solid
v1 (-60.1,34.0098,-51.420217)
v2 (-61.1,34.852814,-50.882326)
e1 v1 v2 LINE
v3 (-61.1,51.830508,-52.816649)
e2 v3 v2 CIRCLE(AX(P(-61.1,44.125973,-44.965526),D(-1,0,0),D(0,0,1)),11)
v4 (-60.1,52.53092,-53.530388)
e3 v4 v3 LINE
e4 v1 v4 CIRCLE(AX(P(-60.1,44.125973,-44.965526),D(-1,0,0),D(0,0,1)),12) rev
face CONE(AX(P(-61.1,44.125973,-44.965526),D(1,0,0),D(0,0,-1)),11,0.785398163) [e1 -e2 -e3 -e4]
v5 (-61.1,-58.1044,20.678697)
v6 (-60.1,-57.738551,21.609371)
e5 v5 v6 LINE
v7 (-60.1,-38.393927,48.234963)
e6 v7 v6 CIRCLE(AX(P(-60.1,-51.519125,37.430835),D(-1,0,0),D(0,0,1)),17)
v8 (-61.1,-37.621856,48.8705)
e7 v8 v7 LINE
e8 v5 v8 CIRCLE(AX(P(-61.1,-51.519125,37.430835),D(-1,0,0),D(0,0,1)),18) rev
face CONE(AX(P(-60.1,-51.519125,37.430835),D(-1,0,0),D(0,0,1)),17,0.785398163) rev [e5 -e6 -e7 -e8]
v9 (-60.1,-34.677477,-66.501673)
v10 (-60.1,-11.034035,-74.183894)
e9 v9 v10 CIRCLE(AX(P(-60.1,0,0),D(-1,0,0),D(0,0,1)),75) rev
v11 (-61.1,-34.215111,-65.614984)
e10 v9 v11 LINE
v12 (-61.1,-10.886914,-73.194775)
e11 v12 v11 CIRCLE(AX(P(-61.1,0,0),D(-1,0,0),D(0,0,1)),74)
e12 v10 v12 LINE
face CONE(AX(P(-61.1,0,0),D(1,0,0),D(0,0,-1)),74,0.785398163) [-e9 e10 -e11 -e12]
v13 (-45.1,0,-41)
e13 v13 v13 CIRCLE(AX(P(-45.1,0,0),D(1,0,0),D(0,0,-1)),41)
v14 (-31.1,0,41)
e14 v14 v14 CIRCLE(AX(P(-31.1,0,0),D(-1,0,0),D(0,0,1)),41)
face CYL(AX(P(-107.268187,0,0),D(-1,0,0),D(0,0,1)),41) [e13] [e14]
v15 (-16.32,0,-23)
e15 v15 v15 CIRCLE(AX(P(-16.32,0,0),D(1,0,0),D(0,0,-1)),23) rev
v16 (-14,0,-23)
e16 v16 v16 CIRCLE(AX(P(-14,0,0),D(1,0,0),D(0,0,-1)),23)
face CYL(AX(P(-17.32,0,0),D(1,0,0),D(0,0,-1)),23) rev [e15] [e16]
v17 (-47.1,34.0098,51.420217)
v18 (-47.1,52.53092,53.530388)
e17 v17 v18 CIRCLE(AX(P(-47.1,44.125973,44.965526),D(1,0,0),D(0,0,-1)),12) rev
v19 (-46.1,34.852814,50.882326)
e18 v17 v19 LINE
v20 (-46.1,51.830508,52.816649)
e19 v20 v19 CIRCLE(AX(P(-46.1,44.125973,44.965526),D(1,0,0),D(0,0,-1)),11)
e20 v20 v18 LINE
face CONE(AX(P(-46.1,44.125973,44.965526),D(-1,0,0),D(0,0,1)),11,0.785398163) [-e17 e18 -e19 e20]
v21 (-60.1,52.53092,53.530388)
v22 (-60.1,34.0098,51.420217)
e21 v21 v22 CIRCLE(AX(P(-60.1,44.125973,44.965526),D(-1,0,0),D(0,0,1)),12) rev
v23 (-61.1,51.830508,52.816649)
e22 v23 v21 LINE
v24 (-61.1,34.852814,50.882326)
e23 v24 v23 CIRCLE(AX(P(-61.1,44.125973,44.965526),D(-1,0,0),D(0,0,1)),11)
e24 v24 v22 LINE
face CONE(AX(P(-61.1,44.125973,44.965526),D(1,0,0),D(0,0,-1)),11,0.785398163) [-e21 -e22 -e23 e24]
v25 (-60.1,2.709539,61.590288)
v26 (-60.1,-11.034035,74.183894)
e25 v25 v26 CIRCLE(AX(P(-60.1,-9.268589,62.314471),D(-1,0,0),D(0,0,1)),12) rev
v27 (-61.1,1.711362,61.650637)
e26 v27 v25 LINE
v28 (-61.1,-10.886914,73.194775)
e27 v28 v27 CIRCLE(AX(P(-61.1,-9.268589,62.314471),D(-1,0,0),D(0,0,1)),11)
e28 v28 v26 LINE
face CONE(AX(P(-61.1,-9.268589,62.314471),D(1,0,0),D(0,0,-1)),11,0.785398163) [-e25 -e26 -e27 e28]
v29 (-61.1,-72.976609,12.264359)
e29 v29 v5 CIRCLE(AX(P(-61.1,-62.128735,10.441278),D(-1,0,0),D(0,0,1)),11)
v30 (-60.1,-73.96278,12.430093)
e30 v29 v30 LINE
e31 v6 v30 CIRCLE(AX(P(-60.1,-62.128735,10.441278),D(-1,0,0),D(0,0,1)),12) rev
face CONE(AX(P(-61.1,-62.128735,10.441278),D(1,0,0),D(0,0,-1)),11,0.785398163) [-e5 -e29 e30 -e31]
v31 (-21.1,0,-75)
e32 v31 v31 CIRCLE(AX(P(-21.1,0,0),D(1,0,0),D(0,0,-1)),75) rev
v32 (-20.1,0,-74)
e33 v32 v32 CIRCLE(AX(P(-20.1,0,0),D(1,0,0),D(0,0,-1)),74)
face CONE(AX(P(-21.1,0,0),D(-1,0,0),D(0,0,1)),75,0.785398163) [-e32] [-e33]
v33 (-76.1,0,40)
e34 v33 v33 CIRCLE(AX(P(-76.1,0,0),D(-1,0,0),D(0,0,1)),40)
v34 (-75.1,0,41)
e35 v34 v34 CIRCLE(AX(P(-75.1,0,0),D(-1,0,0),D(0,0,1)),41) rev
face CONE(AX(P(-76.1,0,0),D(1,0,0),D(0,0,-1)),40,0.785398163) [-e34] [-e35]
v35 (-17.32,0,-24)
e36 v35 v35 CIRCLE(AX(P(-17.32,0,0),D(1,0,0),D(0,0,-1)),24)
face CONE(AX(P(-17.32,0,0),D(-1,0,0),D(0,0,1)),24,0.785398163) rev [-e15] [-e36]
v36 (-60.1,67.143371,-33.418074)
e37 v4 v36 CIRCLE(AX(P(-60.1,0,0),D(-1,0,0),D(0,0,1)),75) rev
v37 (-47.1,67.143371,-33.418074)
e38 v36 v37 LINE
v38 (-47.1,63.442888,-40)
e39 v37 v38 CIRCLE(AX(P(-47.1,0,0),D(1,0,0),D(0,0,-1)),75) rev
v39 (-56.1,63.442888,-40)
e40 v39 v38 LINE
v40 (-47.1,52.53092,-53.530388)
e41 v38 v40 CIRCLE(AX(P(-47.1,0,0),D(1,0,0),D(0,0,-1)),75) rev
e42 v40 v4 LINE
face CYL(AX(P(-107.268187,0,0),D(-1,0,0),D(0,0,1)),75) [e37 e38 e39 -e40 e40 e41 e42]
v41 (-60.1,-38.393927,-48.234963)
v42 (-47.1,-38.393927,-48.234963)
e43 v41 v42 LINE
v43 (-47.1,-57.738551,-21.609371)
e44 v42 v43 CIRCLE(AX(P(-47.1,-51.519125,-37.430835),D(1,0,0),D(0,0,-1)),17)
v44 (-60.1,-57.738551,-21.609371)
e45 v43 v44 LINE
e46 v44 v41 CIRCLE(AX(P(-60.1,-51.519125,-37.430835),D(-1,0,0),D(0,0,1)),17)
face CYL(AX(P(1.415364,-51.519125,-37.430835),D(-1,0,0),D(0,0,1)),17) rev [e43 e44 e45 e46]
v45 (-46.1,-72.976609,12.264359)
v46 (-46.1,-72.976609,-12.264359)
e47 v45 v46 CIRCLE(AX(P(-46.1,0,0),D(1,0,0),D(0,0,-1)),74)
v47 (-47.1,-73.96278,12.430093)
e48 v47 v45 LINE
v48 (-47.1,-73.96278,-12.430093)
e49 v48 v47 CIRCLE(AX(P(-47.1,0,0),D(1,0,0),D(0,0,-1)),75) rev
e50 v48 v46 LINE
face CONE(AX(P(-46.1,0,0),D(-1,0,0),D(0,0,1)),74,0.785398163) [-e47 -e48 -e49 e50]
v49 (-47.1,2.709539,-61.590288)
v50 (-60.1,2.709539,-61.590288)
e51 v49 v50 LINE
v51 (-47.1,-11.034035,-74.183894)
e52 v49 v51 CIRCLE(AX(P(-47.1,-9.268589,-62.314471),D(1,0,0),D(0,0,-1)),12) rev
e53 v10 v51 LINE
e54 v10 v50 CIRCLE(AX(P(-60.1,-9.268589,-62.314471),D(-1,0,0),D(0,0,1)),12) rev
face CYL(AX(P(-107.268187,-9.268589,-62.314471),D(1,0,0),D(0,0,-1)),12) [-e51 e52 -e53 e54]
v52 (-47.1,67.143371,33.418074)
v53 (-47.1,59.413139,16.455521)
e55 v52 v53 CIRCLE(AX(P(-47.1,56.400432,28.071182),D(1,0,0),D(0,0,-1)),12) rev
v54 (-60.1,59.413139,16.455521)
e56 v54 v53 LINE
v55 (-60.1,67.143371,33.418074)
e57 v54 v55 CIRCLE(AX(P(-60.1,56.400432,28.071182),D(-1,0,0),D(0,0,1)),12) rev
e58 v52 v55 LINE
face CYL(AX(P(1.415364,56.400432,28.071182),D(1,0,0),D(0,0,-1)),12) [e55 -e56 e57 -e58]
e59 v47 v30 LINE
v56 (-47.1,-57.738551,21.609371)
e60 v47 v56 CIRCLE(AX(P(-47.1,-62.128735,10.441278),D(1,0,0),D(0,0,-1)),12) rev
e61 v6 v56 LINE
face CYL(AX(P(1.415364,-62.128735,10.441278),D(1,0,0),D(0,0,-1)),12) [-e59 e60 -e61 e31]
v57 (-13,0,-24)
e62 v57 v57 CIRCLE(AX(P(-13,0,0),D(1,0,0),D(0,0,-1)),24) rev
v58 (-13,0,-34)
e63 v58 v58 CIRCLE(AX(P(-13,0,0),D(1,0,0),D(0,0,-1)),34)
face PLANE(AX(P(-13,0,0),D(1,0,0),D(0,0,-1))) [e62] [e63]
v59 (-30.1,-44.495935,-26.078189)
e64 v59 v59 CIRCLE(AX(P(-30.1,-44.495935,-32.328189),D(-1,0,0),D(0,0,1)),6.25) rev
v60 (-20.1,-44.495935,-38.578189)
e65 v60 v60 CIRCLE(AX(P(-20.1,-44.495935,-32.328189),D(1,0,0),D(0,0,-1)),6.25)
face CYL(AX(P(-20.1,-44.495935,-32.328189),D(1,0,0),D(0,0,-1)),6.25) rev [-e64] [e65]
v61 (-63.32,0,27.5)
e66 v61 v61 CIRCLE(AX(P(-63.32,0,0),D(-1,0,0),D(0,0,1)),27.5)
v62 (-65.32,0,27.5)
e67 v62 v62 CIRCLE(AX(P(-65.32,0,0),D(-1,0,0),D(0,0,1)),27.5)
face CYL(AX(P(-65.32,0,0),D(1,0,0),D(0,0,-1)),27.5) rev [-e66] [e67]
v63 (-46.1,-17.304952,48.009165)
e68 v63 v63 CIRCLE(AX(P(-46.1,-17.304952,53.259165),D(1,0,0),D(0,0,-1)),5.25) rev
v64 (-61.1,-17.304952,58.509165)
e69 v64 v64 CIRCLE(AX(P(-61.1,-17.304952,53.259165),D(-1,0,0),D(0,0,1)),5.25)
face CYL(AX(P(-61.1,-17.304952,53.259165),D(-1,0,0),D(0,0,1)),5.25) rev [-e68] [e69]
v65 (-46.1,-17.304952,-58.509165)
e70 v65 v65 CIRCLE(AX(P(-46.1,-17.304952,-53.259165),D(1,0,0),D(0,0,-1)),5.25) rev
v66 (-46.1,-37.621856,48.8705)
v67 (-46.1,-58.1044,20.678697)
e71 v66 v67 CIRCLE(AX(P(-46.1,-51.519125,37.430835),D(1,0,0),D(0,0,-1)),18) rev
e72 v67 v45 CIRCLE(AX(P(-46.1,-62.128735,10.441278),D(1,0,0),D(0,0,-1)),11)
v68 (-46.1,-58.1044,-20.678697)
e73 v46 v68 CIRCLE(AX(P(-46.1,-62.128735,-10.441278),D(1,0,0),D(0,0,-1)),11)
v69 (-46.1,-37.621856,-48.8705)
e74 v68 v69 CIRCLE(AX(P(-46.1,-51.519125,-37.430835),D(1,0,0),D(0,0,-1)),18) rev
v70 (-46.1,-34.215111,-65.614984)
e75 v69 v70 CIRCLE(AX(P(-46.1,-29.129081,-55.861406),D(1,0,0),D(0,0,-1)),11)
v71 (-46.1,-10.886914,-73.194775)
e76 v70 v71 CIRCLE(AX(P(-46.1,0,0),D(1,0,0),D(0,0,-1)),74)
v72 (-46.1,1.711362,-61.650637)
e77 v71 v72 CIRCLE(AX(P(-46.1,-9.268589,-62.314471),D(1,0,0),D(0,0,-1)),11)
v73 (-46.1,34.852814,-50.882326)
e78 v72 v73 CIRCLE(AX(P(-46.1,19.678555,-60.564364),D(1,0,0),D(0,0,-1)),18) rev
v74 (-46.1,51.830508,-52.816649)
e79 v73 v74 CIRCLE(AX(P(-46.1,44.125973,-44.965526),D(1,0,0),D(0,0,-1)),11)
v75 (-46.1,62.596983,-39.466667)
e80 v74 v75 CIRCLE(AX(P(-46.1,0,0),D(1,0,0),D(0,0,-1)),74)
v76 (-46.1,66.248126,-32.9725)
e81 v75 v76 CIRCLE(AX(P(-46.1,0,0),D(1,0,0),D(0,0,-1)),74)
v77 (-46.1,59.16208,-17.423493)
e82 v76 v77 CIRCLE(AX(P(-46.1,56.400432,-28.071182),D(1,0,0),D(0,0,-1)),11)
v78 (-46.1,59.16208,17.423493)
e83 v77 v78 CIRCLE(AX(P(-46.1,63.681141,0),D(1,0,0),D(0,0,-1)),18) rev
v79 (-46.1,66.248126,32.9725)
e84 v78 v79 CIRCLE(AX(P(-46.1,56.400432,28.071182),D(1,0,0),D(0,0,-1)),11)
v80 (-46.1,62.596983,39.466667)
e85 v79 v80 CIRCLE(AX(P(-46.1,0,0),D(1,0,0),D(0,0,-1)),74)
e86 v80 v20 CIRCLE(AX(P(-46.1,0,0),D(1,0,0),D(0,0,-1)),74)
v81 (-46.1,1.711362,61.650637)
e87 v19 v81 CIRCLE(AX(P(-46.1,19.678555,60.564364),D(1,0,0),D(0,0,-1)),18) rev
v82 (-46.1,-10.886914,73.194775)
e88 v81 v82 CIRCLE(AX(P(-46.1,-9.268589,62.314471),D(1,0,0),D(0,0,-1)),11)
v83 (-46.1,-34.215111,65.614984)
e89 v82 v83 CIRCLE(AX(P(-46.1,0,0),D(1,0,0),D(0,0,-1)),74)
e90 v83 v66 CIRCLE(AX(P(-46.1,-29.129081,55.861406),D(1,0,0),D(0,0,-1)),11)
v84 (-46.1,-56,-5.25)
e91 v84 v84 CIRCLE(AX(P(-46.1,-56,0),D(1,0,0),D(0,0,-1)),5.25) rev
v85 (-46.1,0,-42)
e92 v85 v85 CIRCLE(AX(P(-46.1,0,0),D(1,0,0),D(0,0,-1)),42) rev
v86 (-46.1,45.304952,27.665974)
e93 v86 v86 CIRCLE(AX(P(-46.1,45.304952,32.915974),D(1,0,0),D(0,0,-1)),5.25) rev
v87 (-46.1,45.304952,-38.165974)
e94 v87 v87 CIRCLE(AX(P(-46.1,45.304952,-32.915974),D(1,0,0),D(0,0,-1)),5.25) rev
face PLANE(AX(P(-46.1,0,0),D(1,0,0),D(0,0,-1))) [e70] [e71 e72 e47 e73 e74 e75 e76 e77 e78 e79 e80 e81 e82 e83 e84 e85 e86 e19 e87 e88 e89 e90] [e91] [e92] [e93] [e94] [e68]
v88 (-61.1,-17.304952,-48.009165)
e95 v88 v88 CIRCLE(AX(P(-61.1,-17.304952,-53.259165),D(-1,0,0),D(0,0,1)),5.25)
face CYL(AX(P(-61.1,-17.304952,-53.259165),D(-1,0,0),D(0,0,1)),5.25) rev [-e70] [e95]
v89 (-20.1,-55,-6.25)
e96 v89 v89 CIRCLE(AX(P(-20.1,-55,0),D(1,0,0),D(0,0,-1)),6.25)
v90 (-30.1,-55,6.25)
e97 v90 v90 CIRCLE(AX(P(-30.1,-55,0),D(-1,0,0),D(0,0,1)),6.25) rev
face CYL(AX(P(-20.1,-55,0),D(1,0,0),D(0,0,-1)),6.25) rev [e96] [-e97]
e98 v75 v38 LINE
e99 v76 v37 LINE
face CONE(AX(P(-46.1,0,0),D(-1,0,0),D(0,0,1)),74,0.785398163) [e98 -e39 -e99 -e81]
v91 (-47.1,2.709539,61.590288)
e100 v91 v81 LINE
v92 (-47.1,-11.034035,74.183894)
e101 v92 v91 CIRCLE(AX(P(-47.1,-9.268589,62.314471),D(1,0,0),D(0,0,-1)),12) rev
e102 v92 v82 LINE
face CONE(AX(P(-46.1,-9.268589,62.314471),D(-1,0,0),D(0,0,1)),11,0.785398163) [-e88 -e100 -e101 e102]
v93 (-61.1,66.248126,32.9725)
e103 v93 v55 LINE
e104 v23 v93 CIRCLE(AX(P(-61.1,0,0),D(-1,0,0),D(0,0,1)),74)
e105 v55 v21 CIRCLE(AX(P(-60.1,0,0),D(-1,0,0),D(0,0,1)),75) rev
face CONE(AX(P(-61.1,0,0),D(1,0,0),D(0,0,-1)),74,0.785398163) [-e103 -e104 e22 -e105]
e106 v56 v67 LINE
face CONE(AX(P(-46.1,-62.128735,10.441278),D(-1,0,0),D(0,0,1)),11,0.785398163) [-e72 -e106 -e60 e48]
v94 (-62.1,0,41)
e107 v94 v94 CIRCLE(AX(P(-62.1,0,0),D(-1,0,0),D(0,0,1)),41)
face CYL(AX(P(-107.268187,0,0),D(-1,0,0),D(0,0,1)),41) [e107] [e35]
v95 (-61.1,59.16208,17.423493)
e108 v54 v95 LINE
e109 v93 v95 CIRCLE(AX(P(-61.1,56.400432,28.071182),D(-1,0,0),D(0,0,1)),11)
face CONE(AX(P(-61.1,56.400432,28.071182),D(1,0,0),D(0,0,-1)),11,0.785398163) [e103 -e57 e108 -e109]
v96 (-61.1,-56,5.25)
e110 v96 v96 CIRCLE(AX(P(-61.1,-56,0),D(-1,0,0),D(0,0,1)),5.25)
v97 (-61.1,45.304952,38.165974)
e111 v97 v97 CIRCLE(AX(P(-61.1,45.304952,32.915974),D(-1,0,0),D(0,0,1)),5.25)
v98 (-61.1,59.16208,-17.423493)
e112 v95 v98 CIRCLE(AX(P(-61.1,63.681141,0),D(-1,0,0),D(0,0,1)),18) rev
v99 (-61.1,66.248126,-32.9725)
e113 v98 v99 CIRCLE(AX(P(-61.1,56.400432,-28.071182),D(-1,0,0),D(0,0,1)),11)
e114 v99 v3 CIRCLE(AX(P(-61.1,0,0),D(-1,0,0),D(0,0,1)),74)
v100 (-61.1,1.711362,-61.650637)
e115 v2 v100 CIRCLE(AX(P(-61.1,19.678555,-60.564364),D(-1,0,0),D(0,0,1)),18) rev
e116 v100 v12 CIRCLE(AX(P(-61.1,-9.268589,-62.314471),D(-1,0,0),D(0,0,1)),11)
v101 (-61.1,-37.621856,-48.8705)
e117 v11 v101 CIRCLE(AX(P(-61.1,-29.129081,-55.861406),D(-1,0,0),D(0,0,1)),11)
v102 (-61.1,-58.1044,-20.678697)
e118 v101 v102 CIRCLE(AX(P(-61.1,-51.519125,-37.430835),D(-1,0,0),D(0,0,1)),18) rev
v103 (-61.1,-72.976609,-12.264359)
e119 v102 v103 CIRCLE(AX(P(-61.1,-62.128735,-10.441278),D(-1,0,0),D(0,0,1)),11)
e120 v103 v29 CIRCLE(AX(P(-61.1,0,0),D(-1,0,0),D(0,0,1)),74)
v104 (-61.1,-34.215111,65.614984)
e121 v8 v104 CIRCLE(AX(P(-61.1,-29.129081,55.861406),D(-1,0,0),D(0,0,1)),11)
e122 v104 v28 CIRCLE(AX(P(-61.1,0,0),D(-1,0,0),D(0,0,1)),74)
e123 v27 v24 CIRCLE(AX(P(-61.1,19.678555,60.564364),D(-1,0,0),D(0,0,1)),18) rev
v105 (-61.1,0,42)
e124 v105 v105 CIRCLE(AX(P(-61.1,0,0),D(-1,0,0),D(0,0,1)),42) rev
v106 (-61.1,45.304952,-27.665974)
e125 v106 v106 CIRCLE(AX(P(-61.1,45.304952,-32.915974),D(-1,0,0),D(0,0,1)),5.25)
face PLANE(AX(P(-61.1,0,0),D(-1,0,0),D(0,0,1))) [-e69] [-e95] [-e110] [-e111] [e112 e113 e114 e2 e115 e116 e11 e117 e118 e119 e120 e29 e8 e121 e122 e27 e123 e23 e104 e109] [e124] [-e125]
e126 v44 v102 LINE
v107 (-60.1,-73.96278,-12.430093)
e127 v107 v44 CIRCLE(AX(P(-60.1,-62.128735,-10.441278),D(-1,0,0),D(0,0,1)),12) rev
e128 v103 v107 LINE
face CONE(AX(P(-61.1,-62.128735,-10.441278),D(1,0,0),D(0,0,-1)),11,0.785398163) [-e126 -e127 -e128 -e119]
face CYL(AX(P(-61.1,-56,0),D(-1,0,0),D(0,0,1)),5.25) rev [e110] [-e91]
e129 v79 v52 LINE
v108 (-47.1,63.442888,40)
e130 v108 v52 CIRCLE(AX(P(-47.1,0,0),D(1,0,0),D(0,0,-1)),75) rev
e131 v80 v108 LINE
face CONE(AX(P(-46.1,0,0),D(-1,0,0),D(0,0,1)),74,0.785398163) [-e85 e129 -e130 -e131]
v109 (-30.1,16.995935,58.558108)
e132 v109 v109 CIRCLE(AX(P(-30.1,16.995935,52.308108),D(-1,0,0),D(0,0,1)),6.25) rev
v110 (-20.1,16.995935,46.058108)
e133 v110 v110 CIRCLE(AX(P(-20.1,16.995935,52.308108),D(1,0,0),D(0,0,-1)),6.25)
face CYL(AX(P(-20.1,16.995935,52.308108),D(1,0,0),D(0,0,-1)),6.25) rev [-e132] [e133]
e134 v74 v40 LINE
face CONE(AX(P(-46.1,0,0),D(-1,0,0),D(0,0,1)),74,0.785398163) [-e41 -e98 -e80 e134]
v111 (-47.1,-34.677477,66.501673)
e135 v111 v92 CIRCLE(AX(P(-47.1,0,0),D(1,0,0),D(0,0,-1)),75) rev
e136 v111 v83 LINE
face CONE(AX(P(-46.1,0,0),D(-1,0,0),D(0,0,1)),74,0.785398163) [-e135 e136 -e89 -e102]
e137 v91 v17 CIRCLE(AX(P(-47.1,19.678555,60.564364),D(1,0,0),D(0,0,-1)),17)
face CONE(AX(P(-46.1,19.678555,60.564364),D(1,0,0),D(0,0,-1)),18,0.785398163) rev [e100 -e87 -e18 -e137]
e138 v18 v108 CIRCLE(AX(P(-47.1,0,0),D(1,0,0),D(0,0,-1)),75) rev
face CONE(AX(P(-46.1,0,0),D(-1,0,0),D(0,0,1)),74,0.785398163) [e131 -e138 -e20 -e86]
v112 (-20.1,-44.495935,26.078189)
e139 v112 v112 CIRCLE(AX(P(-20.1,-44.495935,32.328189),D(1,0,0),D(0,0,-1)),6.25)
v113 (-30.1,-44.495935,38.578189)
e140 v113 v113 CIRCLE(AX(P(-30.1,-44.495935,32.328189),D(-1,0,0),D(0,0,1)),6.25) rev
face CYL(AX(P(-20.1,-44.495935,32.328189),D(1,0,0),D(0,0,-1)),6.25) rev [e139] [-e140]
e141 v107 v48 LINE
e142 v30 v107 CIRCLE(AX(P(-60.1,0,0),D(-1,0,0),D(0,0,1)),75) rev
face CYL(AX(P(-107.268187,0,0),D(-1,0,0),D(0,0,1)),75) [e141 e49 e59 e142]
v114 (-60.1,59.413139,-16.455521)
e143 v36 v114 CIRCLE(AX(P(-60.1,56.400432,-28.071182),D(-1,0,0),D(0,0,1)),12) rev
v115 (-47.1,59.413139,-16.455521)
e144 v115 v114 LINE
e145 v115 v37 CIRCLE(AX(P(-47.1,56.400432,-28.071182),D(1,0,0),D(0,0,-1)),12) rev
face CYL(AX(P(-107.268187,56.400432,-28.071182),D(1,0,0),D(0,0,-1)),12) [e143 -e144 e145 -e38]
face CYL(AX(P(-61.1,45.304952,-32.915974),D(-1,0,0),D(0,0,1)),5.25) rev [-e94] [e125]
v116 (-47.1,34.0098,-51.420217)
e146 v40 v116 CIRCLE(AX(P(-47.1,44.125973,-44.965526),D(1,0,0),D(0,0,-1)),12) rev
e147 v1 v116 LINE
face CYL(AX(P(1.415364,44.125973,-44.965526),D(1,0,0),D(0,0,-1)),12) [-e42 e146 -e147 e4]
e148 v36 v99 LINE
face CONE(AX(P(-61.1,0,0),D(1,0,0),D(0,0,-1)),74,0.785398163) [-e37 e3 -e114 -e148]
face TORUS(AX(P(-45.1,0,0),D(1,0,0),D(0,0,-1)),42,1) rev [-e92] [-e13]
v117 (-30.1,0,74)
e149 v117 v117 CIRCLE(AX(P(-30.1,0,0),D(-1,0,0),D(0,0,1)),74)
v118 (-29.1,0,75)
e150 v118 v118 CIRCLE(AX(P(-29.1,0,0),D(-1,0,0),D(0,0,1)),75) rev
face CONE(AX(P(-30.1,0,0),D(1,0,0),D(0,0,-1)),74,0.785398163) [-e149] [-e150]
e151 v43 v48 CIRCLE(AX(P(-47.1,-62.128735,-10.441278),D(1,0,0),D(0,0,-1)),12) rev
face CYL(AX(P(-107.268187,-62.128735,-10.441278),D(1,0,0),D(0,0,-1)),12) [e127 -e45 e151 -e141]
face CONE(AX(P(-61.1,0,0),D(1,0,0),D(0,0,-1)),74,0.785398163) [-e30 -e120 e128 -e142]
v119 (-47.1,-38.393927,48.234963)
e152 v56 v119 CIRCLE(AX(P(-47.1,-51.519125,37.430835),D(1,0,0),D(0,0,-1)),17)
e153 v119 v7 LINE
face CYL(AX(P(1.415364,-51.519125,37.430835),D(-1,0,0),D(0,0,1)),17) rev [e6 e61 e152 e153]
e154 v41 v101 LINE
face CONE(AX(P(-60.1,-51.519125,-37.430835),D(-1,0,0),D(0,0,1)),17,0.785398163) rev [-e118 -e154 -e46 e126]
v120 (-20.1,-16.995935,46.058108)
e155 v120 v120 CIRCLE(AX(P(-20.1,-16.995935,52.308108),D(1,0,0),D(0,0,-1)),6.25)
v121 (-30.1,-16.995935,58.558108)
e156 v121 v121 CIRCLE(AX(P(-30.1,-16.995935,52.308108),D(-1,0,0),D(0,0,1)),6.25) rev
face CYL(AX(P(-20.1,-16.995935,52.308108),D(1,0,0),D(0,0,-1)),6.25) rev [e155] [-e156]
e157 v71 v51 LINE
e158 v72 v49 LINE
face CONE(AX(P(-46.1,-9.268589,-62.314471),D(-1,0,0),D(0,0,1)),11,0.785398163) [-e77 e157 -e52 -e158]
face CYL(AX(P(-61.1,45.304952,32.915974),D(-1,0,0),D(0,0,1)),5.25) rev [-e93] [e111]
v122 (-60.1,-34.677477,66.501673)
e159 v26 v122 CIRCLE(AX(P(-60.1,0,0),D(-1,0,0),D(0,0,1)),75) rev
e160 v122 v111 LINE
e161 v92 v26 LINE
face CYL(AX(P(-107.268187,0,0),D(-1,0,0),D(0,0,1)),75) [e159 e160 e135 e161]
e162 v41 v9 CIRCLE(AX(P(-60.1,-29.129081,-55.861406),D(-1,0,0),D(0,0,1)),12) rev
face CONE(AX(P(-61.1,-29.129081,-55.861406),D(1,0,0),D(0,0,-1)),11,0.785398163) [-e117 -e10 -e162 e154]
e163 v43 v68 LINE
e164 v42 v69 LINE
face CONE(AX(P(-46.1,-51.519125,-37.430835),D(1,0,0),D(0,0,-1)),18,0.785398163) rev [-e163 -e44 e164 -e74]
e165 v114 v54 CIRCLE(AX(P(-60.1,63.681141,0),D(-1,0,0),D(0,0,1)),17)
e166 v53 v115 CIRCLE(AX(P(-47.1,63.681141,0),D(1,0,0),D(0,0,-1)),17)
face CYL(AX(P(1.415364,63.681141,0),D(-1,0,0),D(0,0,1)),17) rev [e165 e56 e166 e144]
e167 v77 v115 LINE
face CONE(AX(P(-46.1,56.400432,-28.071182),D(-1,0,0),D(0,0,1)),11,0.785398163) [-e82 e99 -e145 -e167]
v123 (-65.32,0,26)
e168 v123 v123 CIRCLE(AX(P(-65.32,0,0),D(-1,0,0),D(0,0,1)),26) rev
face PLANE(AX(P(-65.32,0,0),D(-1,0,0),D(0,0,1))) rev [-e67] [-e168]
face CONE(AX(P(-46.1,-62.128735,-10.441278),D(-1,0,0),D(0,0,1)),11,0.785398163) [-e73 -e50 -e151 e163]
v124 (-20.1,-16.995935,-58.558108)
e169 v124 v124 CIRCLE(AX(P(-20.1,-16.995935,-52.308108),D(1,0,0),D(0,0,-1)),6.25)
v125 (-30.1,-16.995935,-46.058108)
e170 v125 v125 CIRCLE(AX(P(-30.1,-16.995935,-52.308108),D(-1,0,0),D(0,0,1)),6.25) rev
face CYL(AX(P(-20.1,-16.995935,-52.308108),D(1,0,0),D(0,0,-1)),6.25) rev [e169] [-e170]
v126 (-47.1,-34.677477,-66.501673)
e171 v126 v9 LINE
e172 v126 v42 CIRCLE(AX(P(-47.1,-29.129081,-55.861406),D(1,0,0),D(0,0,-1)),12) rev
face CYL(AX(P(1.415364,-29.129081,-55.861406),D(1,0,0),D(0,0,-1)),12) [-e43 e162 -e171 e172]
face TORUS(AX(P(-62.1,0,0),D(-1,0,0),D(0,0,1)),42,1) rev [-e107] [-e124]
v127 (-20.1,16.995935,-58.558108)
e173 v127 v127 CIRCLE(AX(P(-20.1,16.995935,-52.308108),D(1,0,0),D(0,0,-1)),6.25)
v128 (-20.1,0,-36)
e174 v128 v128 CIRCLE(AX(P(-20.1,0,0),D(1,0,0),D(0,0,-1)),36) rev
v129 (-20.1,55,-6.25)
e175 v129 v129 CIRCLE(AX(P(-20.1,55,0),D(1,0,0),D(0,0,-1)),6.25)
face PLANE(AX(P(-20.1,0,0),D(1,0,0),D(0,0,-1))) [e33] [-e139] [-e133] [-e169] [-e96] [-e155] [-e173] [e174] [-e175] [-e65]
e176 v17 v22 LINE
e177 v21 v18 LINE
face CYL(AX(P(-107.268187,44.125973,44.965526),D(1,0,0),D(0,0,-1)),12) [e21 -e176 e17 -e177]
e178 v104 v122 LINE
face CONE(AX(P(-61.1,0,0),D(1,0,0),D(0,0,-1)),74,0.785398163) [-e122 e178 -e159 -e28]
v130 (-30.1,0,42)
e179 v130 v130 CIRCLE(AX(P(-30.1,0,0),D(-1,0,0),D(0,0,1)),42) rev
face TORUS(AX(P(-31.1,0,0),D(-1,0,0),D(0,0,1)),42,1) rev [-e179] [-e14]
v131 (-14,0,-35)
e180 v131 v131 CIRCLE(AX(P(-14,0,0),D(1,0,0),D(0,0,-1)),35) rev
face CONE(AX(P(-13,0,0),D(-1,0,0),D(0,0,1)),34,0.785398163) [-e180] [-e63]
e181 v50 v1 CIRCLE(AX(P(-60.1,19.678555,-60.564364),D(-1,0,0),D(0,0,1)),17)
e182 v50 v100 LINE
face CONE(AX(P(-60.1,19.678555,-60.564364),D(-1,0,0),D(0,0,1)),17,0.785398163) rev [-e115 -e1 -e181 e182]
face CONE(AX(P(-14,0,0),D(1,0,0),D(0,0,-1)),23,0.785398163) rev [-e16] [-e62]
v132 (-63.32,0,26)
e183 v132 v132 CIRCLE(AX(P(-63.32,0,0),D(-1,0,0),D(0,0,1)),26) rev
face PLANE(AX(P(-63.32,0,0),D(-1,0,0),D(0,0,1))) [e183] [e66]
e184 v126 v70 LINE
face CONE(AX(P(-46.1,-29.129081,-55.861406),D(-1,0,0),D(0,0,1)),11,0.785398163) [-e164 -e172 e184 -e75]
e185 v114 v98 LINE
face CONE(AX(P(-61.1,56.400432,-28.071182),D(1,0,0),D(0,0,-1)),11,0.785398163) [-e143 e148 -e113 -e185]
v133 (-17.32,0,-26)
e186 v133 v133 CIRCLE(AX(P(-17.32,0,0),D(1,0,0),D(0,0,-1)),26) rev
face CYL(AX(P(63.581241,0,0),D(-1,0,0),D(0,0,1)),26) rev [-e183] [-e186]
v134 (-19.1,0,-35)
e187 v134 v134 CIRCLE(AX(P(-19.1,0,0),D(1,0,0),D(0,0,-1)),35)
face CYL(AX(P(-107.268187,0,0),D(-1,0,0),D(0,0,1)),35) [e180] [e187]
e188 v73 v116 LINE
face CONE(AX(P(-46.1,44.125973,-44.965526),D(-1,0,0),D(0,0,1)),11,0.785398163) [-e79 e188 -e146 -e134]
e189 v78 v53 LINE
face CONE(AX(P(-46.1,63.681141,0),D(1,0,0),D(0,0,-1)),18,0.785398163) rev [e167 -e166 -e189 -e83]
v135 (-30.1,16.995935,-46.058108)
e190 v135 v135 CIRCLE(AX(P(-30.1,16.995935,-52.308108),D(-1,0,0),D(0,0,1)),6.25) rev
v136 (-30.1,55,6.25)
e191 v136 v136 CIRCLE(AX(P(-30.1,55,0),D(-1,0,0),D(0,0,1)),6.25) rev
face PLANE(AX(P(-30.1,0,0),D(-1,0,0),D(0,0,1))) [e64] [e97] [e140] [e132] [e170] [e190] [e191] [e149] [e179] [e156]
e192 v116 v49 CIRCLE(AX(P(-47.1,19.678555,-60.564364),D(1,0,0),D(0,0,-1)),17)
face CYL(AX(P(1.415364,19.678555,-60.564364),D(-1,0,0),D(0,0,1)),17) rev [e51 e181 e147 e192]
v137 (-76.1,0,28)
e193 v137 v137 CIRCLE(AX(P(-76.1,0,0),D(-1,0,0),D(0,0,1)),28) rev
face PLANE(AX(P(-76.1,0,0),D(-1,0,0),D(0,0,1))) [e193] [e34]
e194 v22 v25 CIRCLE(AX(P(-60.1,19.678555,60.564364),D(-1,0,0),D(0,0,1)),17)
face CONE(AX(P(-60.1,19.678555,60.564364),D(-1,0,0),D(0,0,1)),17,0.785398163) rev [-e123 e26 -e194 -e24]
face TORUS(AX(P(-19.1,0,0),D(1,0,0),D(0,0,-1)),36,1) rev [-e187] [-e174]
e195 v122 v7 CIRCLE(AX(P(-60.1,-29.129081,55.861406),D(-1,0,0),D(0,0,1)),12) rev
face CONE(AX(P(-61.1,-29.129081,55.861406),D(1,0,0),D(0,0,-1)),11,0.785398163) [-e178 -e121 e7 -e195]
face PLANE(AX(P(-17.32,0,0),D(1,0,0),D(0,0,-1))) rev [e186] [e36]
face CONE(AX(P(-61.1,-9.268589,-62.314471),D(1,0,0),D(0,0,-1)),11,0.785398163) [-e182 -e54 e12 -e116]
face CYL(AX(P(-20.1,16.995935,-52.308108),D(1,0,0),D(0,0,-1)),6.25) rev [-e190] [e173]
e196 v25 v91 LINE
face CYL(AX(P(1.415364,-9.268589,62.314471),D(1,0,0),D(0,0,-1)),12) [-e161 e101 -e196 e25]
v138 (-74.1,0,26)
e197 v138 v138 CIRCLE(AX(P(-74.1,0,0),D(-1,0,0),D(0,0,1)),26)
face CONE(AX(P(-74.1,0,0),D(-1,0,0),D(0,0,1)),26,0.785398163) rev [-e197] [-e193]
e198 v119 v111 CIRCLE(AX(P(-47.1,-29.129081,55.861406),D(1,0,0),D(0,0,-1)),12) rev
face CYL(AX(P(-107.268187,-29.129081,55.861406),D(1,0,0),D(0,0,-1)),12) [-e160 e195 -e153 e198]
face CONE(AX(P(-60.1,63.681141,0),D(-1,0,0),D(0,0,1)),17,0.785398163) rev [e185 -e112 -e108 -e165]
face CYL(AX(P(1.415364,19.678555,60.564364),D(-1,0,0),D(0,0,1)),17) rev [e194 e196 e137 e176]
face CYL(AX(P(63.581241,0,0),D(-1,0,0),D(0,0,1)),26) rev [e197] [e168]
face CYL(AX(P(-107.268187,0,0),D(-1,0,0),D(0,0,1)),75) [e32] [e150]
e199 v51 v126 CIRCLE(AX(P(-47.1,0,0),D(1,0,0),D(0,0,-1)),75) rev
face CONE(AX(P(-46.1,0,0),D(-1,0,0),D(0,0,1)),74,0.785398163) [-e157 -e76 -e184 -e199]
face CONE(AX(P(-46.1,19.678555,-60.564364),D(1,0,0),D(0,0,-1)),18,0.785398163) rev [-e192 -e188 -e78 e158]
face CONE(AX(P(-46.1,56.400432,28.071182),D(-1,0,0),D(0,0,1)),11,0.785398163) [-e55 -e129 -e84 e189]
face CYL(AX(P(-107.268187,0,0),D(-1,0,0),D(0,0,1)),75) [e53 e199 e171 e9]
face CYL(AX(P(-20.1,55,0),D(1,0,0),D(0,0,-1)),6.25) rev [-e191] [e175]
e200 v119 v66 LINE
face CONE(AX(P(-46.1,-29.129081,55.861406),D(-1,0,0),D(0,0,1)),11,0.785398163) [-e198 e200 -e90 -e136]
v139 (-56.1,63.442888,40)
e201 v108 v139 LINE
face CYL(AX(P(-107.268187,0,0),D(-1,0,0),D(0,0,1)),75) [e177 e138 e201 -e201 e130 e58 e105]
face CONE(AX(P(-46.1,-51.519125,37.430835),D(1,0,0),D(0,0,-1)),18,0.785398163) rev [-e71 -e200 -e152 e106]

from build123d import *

# Parameters (mm, degrees)
DODANIE_WYCI_GNI_CIE1_START      = -36.1
SZKIC6_R                         = 25
SZKIC6_R_2                       = 15
DODANIE_WYCI_GNI_CIE1_DEPTH      = 36.1
WYTNIJ_WYCI_GNI_CIE4_REACH       = 132.542
SZKIC7_R                         = 15.25
SZKIC7_R_2                       = 15
SZKIC12_R                        = 31
SZKIC12_R_2                      = 15.25
WYTNIJ_WYCI_GNI_CIE9_DEPTH       = 10
WYTNIJ_WYCI_GNI_CIE10_START      = -2
SZKIC13_R                        = 29
SZKIC13_R_2                      = 15.25
WYTNIJ_WYCI_GNI_CIE10_DEPTH      = 2
SZKIC14_R                        = 31
SZKIC14_R_2                      = 26
DODANIE_WYCI_GNI_CIE3_DEPTH      = 52
SZKIC15_R                        = 26
WYTNIJ_WYCI_GNI_CIE11_DEPTH      = 7
SZKIC22_R                        = 27.5
WYTNIJ_WYCI_GNI_CIE18_DEPTH      = 2
SFAZOWANIE1_SIZE                 = 2
SZKIC25_R                        = 75
SZKIC25_R_2                      = 41
WYTNIJ_WYCI_GNI_CIE19_DEPTH      = 5
SZKIC26_R                        = 75
SZKIC26_R_2                      = 41
DODANIE_WYCI_GNI_CIE4_DEPTH      = 5
WYTNIJ_WYCI_GNI_CIE20_START      = -15
WYTNIJ_WYCI_GNI_CIE20_DEPTH      = 15
ZAOKR_GLENIE1_R                  = 12
OTW_R_GWINTOWANY_M12X1_51_REACH  = 124.406
OTW_R_GWINTOWANY_M12X1_51_BORE_R = 5.25
OTW_R_GWINTOWANY_M14X1_51_REACH  = 121.942
OTW_R_GWINTOWANY_M14X1_51_BORE_R = 6.25
ZAOKR_GLENIE2_R                  = 1
SFAZOWANIE2_SIZE                 = 1
SFAZOWANIE3_SIZE                 = 1
DODANIE_WYCI_GNI_CIE5_START      = -2.32
SZKIC34_R                        = 26
SZKIC34_R_2                      = 23
DODANIE_WYCI_GNI_CIE5_DEPTH      = 2.32
SZKIC35_R                        = 35
SZKIC35_R_2                      = 15.25
WYTNIJ_WYCI_GNI_CIE28_DEPTH      = 10
SZKIC37_R                        = 26
WYTNIJ_WYCI_GNI_CIE30_DEPTH      = 4.78
SZKIC38_R                        = 23
WYTNIJ_WYCI_GNI_CIE31_DEPTH      = 2.32
SZKIC39_R                        = 35
WYTNIJ_WYCI_GNI_CIE32_DEPTH      = 5
DODANIE_WYCI_GNI_CIE6_START      = -2.32
SZKIC40_R                        = 26
SZKIC40_R_2                      = 23
DODANIE_WYCI_GNI_CIE6_DEPTH      = 2.32
SZKIC41_R                        = 35
SZKIC41_R_2                      = 23
DODANIE_WYCI_GNI_CIE7_DEPTH      = 2
SFAZOWANIE7_SIZE                 = 1
SFAZOWANIE8_SIZE                 = 1


with BuildPart() as part:
    # Szkic1 → Obrót1 (revolve)
    with BuildSketch(Plane.XY, mode=Mode.PRIVATE) as obr_t1_sk:
        Polygon((-76.1, 31), (-76.1, 41), (-56.1, 41), (-56.1, 75), (-41.1, 75), (-41.1, 41), (-30.1, 41), (-30.1, 75), (-20.1, 75), (-20.1, 35), (0, 35), (0, 25), (-36.1, 25), (-36.1, 31), (-64.1, 31), align=None)
    revolve(obr_t1_sk.sketch.rotate(Axis((-107.268186934, 0, 0), (1, 0, 0)), 90), axis=Axis((-107.268186934, 0, 0), (1, 0, 0)))

    # Szkic6 → Dodanie-wyciągnięcie1 (add)
    with BuildSketch(Plane(origin=(0, 0, 0), x_dir=(0, 0, -1), z_dir=(1, 0, 0)).offset(DODANIE_WYCI_GNI_CIE1_START)):
        Circle(SZKIC6_R)
        Circle(SZKIC6_R_2, mode=Mode.SUBTRACT)
    extrude(amount=DODANIE_WYCI_GNI_CIE1_DEPTH)

    # Szkic7 → Wytnij-wyciągnięcie4 (cut, up to next)
    with BuildSketch(Plane(origin=(0, 0, 0), x_dir=(0, 0, -1), z_dir=(1, 0, 0)), mode=Mode.PRIVATE) as wytnij_wyci_gni_cie4_sk1:
        Circle(SZKIC7_R)
        Circle(SZKIC7_R_2, mode=Mode.SUBTRACT)
    wytnij_wyci_gni_cie4_tool1 = extrude(wytnij_wyci_gni_cie4_sk1.sketch, amount=-WYTNIJ_WYCI_GNI_CIE4_REACH, mode=Mode.PRIVATE) & part.part
    add(wytnij_wyci_gni_cie4_tool1.solids().sort_by_distance((0, 0, 15.206866))[0], mode=Mode.SUBTRACT)

    # Szkic12 → Wytnij-wyciągnięcie9 (cut)
    with BuildSketch(Plane.ZY.offset(36.1)):
        Circle(SZKIC12_R)
        with Locations(Location((0, 0, 0), (0, 0, 180))):
            Circle(SZKIC12_R_2, mode=Mode.SUBTRACT)
    extrude(amount=-WYTNIJ_WYCI_GNI_CIE9_DEPTH, mode=Mode.SUBTRACT)

    # Szkic13 → Wytnij-wyciągnięcie10 (cut)
    with BuildSketch(Plane.ZY.offset(26.1).offset(WYTNIJ_WYCI_GNI_CIE10_START)):
        Circle(SZKIC13_R)
        with Locations(Location((0, 0, 0), (0, 0, 180))):
            Circle(SZKIC13_R_2, mode=Mode.SUBTRACT)
    extrude(amount=WYTNIJ_WYCI_GNI_CIE10_DEPTH, mode=Mode.SUBTRACT)

    # Szkic14 → Dodanie-wyciągnięcie3 (add)
    with BuildSketch(Plane.ZY.offset(76.1)):
        Circle(SZKIC14_R)
        Circle(SZKIC14_R_2, mode=Mode.SUBTRACT)
    extrude(amount=-DODANIE_WYCI_GNI_CIE3_DEPTH)

    # Szkic15 → Wytnij-wyciągnięcie11 (cut)
    with BuildSketch(Plane.ZY.offset(24.1)):
        Circle(SZKIC15_R)
    extrude(amount=-WYTNIJ_WYCI_GNI_CIE11_DEPTH, mode=Mode.SUBTRACT)

    # Szkic22 → Wytnij-wyciągnięcie18 (cut)
    with BuildSketch(Plane.ZY.offset(63.32)):
        Circle(SZKIC22_R)
    extrude(amount=WYTNIJ_WYCI_GNI_CIE18_DEPTH, mode=Mode.SUBTRACT)

    # Sfazowanie1
    sfazowanie1_edges = [part.edges().sort_by_distance(p)[0] for p in [
        (-76.1, 0, -26),
    ]]
    chamfer(sfazowanie1_edges, length=SFAZOWANIE1_SIZE)

    # Szkic25 → Wytnij-wyciągnięcie19 (cut)
    with BuildSketch(Plane(origin=(-41.1, 0, 0), x_dir=(0, 0, -1), z_dir=(1, 0, 0))):
        with Locations(Location((0, 0, 0), (0, 0, 180))):
            Circle(SZKIC25_R)
        with Locations(Location((0, 0, 0), (0, 0, 180))):
            Circle(SZKIC25_R_2, mode=Mode.SUBTRACT)
    extrude(amount=-WYTNIJ_WYCI_GNI_CIE19_DEPTH, mode=Mode.SUBTRACT)

    # Szkic26 → Dodanie-wyciągnięcie4 (add)
    with BuildSketch(Plane.ZY.offset(56.1)):
        Circle(SZKIC26_R)
        Circle(SZKIC26_R_2, mode=Mode.SUBTRACT)
    extrude(amount=DODANIE_WYCI_GNI_CIE4_DEPTH)

    # Szkic27 → Wytnij-wyciągnięcie20 (cut)
    with BuildSketch(Plane.ZY.offset(61.1).offset(WYTNIJ_WYCI_GNI_CIE20_START)):
        with BuildLine():
            ThreePointArc((13.707064455, 73.736804813), (0, 46.681140538), (-13.707064455, 73.736804813))
            ThreePointArc((-13.707064455, 73.736804813), (0, 75), (13.707064455, 73.736804813))
        make_face()
        with BuildLine():
            ThreePointArc((74.363584568, 9.749732829), (44.396402896, 14.425265743), (65.892152848, 35.822118768))
            ThreePointArc((65.892152848, 35.822118768), (71.329238722, 23.176274578), (74.363584568, 9.749732829))
        make_face()
        with BuildLine():
            ThreePointArc((32.252158333, -67.711138544), (27.438485968, -37.765836012), (54.430654508, -51.597517866))
            ThreePointArc((54.430654508, -51.597517866), (44.083893922, -60.676274578), (32.252158333, -67.711138544))
        make_face()
        with BuildLine():
            ThreePointArc((-54.430654508, -51.597517866), (-27.438485968, -37.765836012), (-32.252158333, -67.711138544))
            ThreePointArc((-32.252158333, -67.711138544), (-44.083893922, -60.676274578), (-54.430654508, -51.597517866))
        make_face()
        with BuildLine():
            ThreePointArc((-65.892152848, 35.822118768), (-44.396402896, 14.425265743), (-74.363584568, 9.749732829))
            ThreePointArc((-74.363584568, 9.749732829), (-71.329238722, 23.176274578), (-65.892152848, 35.822118768))
        make_face()
    extrude(amount=WYTNIJ_WYCI_GNI_CIE20_DEPTH, mode=Mode.SUBTRACT)

    # Zaokrąglenie1
    zaokr_glenie1_edges = [part.edges().sort_by_distance(p)[0] for p in [
        (-53.6, 73.736804813, 13.707064455),
        (-53.6, 73.736804813, -13.707064455),
        (-53.6, 9.749732829, 74.363584568),
        (-53.6, 35.822118768, 65.892152848),
        (-53.6, -67.711138544, 32.252158333),
        (-53.6, -51.597517866, 54.430654508),
        (-53.6, -51.597517866, -54.430654508),
        (-53.6, -67.711138544, -32.252158333),
        (-53.6, 35.822118768, -65.892152848),
        (-53.6, 9.749732829, -74.363584568),
    ]]
    fillet(zaokr_glenie1_edges, radius=ZAOKR_GLENIE1_R)

    # Otwór gwintowany M12x1.51 bore → Otwór gwintowany M12x1.51 (cut, up to next)
    with BuildSketch(Plane.ZY.offset(61.1), mode=Mode.PRIVATE) as otw_r_gwintowany_m12x1_51_sk1:
        with Locations((0, -56)):
            Circle(OTW_R_GWINTOWANY_M12X1_51_BORE_R)
    otw_r_gwintowany_m12x1_51_tool1 = extrude(otw_r_gwintowany_m12x1_51_sk1.sketch, amount=-OTW_R_GWINTOWANY_M12X1_51_REACH, mode=Mode.PRIVATE) & part.part
    # Otwór gwintowany M12x1.51 bore → Otwór gwintowany M12x1.51 (cut, up to next)
    with BuildSketch(Plane.ZY.offset(61.1), mode=Mode.PRIVATE) as otw_r_gwintowany_m12x1_51_sk2:
        with Locations((-53.259164913, -17.304951685)):
            Circle(OTW_R_GWINTOWANY_M12X1_51_BORE_R)
    otw_r_gwintowany_m12x1_51_tool2 = extrude(otw_r_gwintowany_m12x1_51_sk2.sketch, amount=-OTW_R_GWINTOWANY_M12X1_51_REACH, mode=Mode.PRIVATE) & part.part
    # Otwór gwintowany M12x1.51 bore → Otwór gwintowany M12x1.51 (cut, up to next)
    with BuildSketch(Plane.ZY.offset(61.1), mode=Mode.PRIVATE) as otw_r_gwintowany_m12x1_51_sk3:
        with Locations((-32.915974128, 45.304951685)):
            Circle(OTW_R_GWINTOWANY_M12X1_51_BORE_R)
    otw_r_gwintowany_m12x1_51_tool3 = extrude(otw_r_gwintowany_m12x1_51_sk3.sketch, amount=-OTW_R_GWINTOWANY_M12X1_51_REACH, mode=Mode.PRIVATE) & part.part
    # Otwór gwintowany M12x1.51 bore → Otwór gwintowany M12x1.51 (cut, up to next)
    with BuildSketch(Plane.ZY.offset(61.1), mode=Mode.PRIVATE) as otw_r_gwintowany_m12x1_51_sk4:
        with Locations((32.915974128, 45.304951685)):
            Circle(OTW_R_GWINTOWANY_M12X1_51_BORE_R)
    otw_r_gwintowany_m12x1_51_tool4 = extrude(otw_r_gwintowany_m12x1_51_sk4.sketch, amount=-OTW_R_GWINTOWANY_M12X1_51_REACH, mode=Mode.PRIVATE) & part.part
    # Otwór gwintowany M12x1.51 bore → Otwór gwintowany M12x1.51 (cut, up to next)
    with BuildSketch(Plane.ZY.offset(61.1), mode=Mode.PRIVATE) as otw_r_gwintowany_m12x1_51_sk5:
        with Locations((53.259164913, -17.304951685)):
            Circle(OTW_R_GWINTOWANY_M12X1_51_BORE_R)
    otw_r_gwintowany_m12x1_51_tool5 = extrude(otw_r_gwintowany_m12x1_51_sk5.sketch, amount=-OTW_R_GWINTOWANY_M12X1_51_REACH, mode=Mode.PRIVATE) & part.part
    add(otw_r_gwintowany_m12x1_51_tool1.solids().sort_by_distance((-61.1, -56, 0))[0], mode=Mode.SUBTRACT)
    add(otw_r_gwintowany_m12x1_51_tool2.solids().sort_by_distance((-61.1, -17.304952, -53.259165))[0], mode=Mode.SUBTRACT)
    add(otw_r_gwintowany_m12x1_51_tool3.solids().sort_by_distance((-61.1, 45.304952, -32.915974))[0], mode=Mode.SUBTRACT)
    add(otw_r_gwintowany_m12x1_51_tool4.solids().sort_by_distance((-61.1, 45.304952, 32.915974))[0], mode=Mode.SUBTRACT)
    add(otw_r_gwintowany_m12x1_51_tool5.solids().sort_by_distance((-61.1, -17.304952, 53.259165))[0], mode=Mode.SUBTRACT)

    # Otwór gwintowany M14x1.51 bore → Otwór gwintowany M14x1.51 (cut, up to next)
    with BuildSketch(Plane(origin=(-20.1, 0, 0), x_dir=(0, 0, -1), z_dir=(1, 0, 0)), mode=Mode.PRIVATE) as otw_r_gwintowany_m14x1_51_sk1:
        with Locations((0, 55)):
            Circle(OTW_R_GWINTOWANY_M14X1_51_BORE_R)
    otw_r_gwintowany_m14x1_51_tool1 = extrude(otw_r_gwintowany_m14x1_51_sk1.sketch, amount=-OTW_R_GWINTOWANY_M14X1_51_REACH, mode=Mode.PRIVATE) & part.part
    # Otwór gwintowany M14x1.51 bore → Otwór gwintowany M14x1.51 (cut, up to next)
    with BuildSketch(Plane(origin=(-20.1, 0, 0), x_dir=(0, 0, -1), z_dir=(1, 0, 0)), mode=Mode.PRIVATE) as otw_r_gwintowany_m14x1_51_sk2:
        with Locations((-52.308108396, 16.995934691)):
            Circle(OTW_R_GWINTOWANY_M14X1_51_BORE_R)
    otw_r_gwintowany_m14x1_51_tool2 = extrude(otw_r_gwintowany_m14x1_51_sk2.sketch, amount=-OTW_R_GWINTOWANY_M14X1_51_REACH, mode=Mode.PRIVATE) & part.part
    # Otwór gwintowany M14x1.51 bore → Otwór gwintowany M14x1.51 (cut, up to next)
    with BuildSketch(Plane(origin=(-20.1, 0, 0), x_dir=(0, 0, -1), z_dir=(1, 0, 0)), mode=Mode.PRIVATE) as otw_r_gwintowany_m14x1_51_sk3:
        with Locations((-52.308108396, -16.995934691)):
            Circle(OTW_R_GWINTOWANY_M14X1_51_BORE_R)
    otw_r_gwintowany_m14x1_51_tool3 = extrude(otw_r_gwintowany_m14x1_51_sk3.sketch, amount=-OTW_R_GWINTOWANY_M14X1_51_REACH, mode=Mode.PRIVATE) & part.part
    # Otwór gwintowany M14x1.51 bore → Otwór gwintowany M14x1.51 (cut, up to next)
    with BuildSketch(Plane(origin=(-20.1, 0, 0), x_dir=(0, 0, -1), z_dir=(1, 0, 0)), mode=Mode.PRIVATE) as otw_r_gwintowany_m14x1_51_sk4:
        with Locations((-32.328188876, -44.495934691)):
            Circle(OTW_R_GWINTOWANY_M14X1_51_BORE_R)
    otw_r_gwintowany_m14x1_51_tool4 = extrude(otw_r_gwintowany_m14x1_51_sk4.sketch, amount=-OTW_R_GWINTOWANY_M14X1_51_REACH, mode=Mode.PRIVATE) & part.part
    # Otwór gwintowany M14x1.51 bore → Otwór gwintowany M14x1.51 (cut, up to next)
    with BuildSketch(Plane(origin=(-20.1, 0, 0), x_dir=(0, 0, -1), z_dir=(1, 0, 0)), mode=Mode.PRIVATE) as otw_r_gwintowany_m14x1_51_sk5:
        with Locations((0, -55)):
            Circle(OTW_R_GWINTOWANY_M14X1_51_BORE_R)
    otw_r_gwintowany_m14x1_51_tool5 = extrude(otw_r_gwintowany_m14x1_51_sk5.sketch, amount=-OTW_R_GWINTOWANY_M14X1_51_REACH, mode=Mode.PRIVATE) & part.part
    # Otwór gwintowany M14x1.51 bore → Otwór gwintowany M14x1.51 (cut, up to next)
    with BuildSketch(Plane(origin=(-20.1, 0, 0), x_dir=(0, 0, -1), z_dir=(1, 0, 0)), mode=Mode.PRIVATE) as otw_r_gwintowany_m14x1_51_sk6:
        with Locations((32.328188876, -44.495934691)):
            Circle(OTW_R_GWINTOWANY_M14X1_51_BORE_R)
    otw_r_gwintowany_m14x1_51_tool6 = extrude(otw_r_gwintowany_m14x1_51_sk6.sketch, amount=-OTW_R_GWINTOWANY_M14X1_51_REACH, mode=Mode.PRIVATE) & part.part
    # Otwór gwintowany M14x1.51 bore → Otwór gwintowany M14x1.51 (cut, up to next)
    with BuildSketch(Plane(origin=(-20.1, 0, 0), x_dir=(0, 0, -1), z_dir=(1, 0, 0)), mode=Mode.PRIVATE) as otw_r_gwintowany_m14x1_51_sk7:
        with Locations((52.308108396, -16.995934691)):
            Circle(OTW_R_GWINTOWANY_M14X1_51_BORE_R)
    otw_r_gwintowany_m14x1_51_tool7 = extrude(otw_r_gwintowany_m14x1_51_sk7.sketch, amount=-OTW_R_GWINTOWANY_M14X1_51_REACH, mode=Mode.PRIVATE) & part.part
    # Otwór gwintowany M14x1.51 bore → Otwór gwintowany M14x1.51 (cut, up to next)
    with BuildSketch(Plane(origin=(-20.1, 0, 0), x_dir=(0, 0, -1), z_dir=(1, 0, 0)), mode=Mode.PRIVATE) as otw_r_gwintowany_m14x1_51_sk8:
        with Locations((52.308108396, 16.995934691)):
            Circle(OTW_R_GWINTOWANY_M14X1_51_BORE_R)
    otw_r_gwintowany_m14x1_51_tool8 = extrude(otw_r_gwintowany_m14x1_51_sk8.sketch, amount=-OTW_R_GWINTOWANY_M14X1_51_REACH, mode=Mode.PRIVATE) & part.part
    add(otw_r_gwintowany_m14x1_51_tool1.solids().sort_by_distance((-20.1, 55, 0))[0], mode=Mode.SUBTRACT)
    add(otw_r_gwintowany_m14x1_51_tool2.solids().sort_by_distance((-20.1, 16.995935, 52.308108))[0], mode=Mode.SUBTRACT)
    add(otw_r_gwintowany_m14x1_51_tool3.solids().sort_by_distance((-20.1, -16.995935, 52.308108))[0], mode=Mode.SUBTRACT)
    add(otw_r_gwintowany_m14x1_51_tool4.solids().sort_by_distance((-20.1, -44.495935, 32.328189))[0], mode=Mode.SUBTRACT)
    add(otw_r_gwintowany_m14x1_51_tool5.solids().sort_by_distance((-20.1, -55, 0))[0], mode=Mode.SUBTRACT)
    add(otw_r_gwintowany_m14x1_51_tool6.solids().sort_by_distance((-20.1, -44.495935, -32.328189))[0], mode=Mode.SUBTRACT)
    add(otw_r_gwintowany_m14x1_51_tool7.solids().sort_by_distance((-20.1, -16.995935, -52.308108))[0], mode=Mode.SUBTRACT)
    add(otw_r_gwintowany_m14x1_51_tool8.solids().sort_by_distance((-20.1, 16.995935, -52.308108))[0], mode=Mode.SUBTRACT)

    # Zaokrąglenie2
    zaokr_glenie2_edges = [part.edges().sort_by_distance(p)[0] for p in [
        (-61.1, 0, -41),
        (-30.1, 0, -41),
        (-20.1, 0, -35),
        (-46.1, 0, -41),
    ]]
    fillet(zaokr_glenie2_edges, radius=ZAOKR_GLENIE2_R)

    # Sfazowanie2
    sfazowanie2_edges = [part.edges().sort_by_distance(p)[0] for p in [
        (-76.1, 0, -41),
        (-30.1, 0, -75),
        (-20.1, 0, -75),
    ]]
    chamfer(sfazowanie2_edges, length=SFAZOWANIE2_SIZE)

    # Sfazowanie3
    sfazowanie3_edges = [part.edges().sort_by_distance(p)[0] for p in [
        (-61.1, -37.765836012, 27.438485968),
        (-46.1, -37.765836012, 27.438485968),
        (-61.1, 46.681140538, 0),
        (-61.1, 60.676274578, -44.083893922),
        (-61.1, 14.425265743, -44.396402896),
        (-61.1, -23.176274578, -71.329238722),
        (-61.1, -37.765836012, -27.438485968),
        (-61.1, -75, 0),
        (-61.1, -23.176274578, 71.329238722),
        (-61.1, 14.425265743, 44.396402896),
        (-61.1, 60.676274578, 44.083893922),
        (-61.1, 67.319978964, -23.094889421),
        (-61.1, 67.319978964, 23.094889421),
        (-61.1, 42.767562637, 56.888391356),
        (-61.1, -1.161527516, 71.161817985),
        (-61.1, -1.161527516, -71.161817985),
        (-61.1, 42.767562637, -56.888391356),
        (-61.1, -68.037842447, -20.885532795),
        (-61.1, -68.037842447, 20.885532795),
        (-61.1, -40.888171638, -58.253848844),
        (-61.1, -40.888171638, 58.253848844),
        (-46.1, -23.176274578, 71.329238722),
        (-46.1, 46.681140538, 0),
        (-46.1, 60.676274578, 44.083893922),
        (-46.1, 14.425265743, 44.396402896),
        (-46.1, -75, 0),
        (-46.1, -37.765836012, -27.438485968),
        (-46.1, -23.176274578, -71.329238722),
        (-46.1, 14.425265743, -44.396402896),
        (-46.1, 60.676274578, -44.083893922),
        (-46.1, 67.319978964, -23.094889421),
        (-46.1, 67.319978964, 23.094889421),
        (-46.1, 42.767562637, 56.888391356),
        (-46.1, -1.161527516, 71.161817985),
        (-46.1, -1.161527516, -71.161817985),
        (-46.1, 42.767562637, -56.888391356),
        (-46.1, -68.037842447, -20.885532795),
        (-46.1, -68.037842447, 20.885532795),
        (-46.1, -40.888171638, -58.253848844),
        (-46.1, -40.888171638, 58.253848844),
        (-46.1, 60.676274578, 44.083893922),
        (-46.1, 60.676274578, -44.083893922),
    ]]
    chamfer(sfazowanie3_edges, length=SFAZOWANIE3_SIZE)

    # Szkic34 → Dodanie-wyciągnięcie5 (add)
    with BuildSketch(Plane(origin=(0, 0, 0), x_dir=(0, 0, -1), z_dir=(1, 0, 0)).offset(DODANIE_WYCI_GNI_CIE5_START)):
        with Locations(Location((0, 0, 0), (0, 0, 180))):
            Circle(SZKIC34_R)
        Circle(SZKIC34_R_2, mode=Mode.SUBTRACT)
    extrude(amount=DODANIE_WYCI_GNI_CIE5_DEPTH)

    # Szkic35 → Wytnij-wyciągnięcie28 (cut)
    with BuildSketch(Plane(origin=(0, 0, 0), x_dir=(0, 0, -1), z_dir=(1, 0, 0))):
        Circle(SZKIC35_R)
        Circle(SZKIC35_R_2, mode=Mode.SUBTRACT)
    extrude(amount=-WYTNIJ_WYCI_GNI_CIE28_DEPTH, mode=Mode.SUBTRACT)

    # Szkic37 → Wytnij-wyciągnięcie30 (cut)
    with BuildSketch(Plane.ZY.offset(17.1)):
        Circle(SZKIC37_R)
    extrude(amount=-WYTNIJ_WYCI_GNI_CIE30_DEPTH, mode=Mode.SUBTRACT)

    # Szkic38 → Wytnij-wyciągnięcie31 (cut)
    with BuildSketch(Plane.ZY.offset(12.32)):
        Circle(SZKIC38_R)
    extrude(amount=-WYTNIJ_WYCI_GNI_CIE31_DEPTH, mode=Mode.SUBTRACT)

    # Szkic39 → Wytnij-wyciągnięcie32 (cut)
    with BuildSketch(Plane(origin=(-10, 0, 0), x_dir=(0, 0, -1), z_dir=(1, 0, 0))):
        Circle(SZKIC39_R)
    extrude(amount=-WYTNIJ_WYCI_GNI_CIE32_DEPTH, mode=Mode.SUBTRACT)

    # Szkic40 → Dodanie-wyciągnięcie6 (add)
    with BuildSketch(Plane(origin=(-15, 0, 0), x_dir=(0, 0, -1), z_dir=(1, 0, 0)).offset(DODANIE_WYCI_GNI_CIE6_START)):
        with Locations(Location((0, 0, 0), (0, 0, 180))):
            Circle(SZKIC40_R)
        Circle(SZKIC40_R_2, mode=Mode.SUBTRACT)
    extrude(amount=DODANIE_WYCI_GNI_CIE6_DEPTH)

    # Szkic41 → Dodanie-wyciągnięcie7 (add)
    with BuildSketch(Plane(origin=(-15, 0, 0), x_dir=(0, 0, -1), z_dir=(1, 0, 0))):
        Circle(SZKIC41_R)
        Circle(SZKIC41_R_2, mode=Mode.SUBTRACT)
    extrude(amount=DODANIE_WYCI_GNI_CIE7_DEPTH)

    # Sfazowanie7
    sfazowanie7_edges = [part.edges().sort_by_distance(p)[0] for p in [
        (-13, 0, 35),
    ]]
    chamfer(sfazowanie7_edges, length=SFAZOWANIE7_SIZE)

    # Sfazowanie8
    sfazowanie8_edges = [part.edges().sort_by_distance(p)[0] for p in [
        (-17.32, 0, 23),
        (-13, 0, 23),
    ]]
    chamfer(sfazowanie8_edges, length=SFAZOWANIE8_SIZE)


solid = part.part
